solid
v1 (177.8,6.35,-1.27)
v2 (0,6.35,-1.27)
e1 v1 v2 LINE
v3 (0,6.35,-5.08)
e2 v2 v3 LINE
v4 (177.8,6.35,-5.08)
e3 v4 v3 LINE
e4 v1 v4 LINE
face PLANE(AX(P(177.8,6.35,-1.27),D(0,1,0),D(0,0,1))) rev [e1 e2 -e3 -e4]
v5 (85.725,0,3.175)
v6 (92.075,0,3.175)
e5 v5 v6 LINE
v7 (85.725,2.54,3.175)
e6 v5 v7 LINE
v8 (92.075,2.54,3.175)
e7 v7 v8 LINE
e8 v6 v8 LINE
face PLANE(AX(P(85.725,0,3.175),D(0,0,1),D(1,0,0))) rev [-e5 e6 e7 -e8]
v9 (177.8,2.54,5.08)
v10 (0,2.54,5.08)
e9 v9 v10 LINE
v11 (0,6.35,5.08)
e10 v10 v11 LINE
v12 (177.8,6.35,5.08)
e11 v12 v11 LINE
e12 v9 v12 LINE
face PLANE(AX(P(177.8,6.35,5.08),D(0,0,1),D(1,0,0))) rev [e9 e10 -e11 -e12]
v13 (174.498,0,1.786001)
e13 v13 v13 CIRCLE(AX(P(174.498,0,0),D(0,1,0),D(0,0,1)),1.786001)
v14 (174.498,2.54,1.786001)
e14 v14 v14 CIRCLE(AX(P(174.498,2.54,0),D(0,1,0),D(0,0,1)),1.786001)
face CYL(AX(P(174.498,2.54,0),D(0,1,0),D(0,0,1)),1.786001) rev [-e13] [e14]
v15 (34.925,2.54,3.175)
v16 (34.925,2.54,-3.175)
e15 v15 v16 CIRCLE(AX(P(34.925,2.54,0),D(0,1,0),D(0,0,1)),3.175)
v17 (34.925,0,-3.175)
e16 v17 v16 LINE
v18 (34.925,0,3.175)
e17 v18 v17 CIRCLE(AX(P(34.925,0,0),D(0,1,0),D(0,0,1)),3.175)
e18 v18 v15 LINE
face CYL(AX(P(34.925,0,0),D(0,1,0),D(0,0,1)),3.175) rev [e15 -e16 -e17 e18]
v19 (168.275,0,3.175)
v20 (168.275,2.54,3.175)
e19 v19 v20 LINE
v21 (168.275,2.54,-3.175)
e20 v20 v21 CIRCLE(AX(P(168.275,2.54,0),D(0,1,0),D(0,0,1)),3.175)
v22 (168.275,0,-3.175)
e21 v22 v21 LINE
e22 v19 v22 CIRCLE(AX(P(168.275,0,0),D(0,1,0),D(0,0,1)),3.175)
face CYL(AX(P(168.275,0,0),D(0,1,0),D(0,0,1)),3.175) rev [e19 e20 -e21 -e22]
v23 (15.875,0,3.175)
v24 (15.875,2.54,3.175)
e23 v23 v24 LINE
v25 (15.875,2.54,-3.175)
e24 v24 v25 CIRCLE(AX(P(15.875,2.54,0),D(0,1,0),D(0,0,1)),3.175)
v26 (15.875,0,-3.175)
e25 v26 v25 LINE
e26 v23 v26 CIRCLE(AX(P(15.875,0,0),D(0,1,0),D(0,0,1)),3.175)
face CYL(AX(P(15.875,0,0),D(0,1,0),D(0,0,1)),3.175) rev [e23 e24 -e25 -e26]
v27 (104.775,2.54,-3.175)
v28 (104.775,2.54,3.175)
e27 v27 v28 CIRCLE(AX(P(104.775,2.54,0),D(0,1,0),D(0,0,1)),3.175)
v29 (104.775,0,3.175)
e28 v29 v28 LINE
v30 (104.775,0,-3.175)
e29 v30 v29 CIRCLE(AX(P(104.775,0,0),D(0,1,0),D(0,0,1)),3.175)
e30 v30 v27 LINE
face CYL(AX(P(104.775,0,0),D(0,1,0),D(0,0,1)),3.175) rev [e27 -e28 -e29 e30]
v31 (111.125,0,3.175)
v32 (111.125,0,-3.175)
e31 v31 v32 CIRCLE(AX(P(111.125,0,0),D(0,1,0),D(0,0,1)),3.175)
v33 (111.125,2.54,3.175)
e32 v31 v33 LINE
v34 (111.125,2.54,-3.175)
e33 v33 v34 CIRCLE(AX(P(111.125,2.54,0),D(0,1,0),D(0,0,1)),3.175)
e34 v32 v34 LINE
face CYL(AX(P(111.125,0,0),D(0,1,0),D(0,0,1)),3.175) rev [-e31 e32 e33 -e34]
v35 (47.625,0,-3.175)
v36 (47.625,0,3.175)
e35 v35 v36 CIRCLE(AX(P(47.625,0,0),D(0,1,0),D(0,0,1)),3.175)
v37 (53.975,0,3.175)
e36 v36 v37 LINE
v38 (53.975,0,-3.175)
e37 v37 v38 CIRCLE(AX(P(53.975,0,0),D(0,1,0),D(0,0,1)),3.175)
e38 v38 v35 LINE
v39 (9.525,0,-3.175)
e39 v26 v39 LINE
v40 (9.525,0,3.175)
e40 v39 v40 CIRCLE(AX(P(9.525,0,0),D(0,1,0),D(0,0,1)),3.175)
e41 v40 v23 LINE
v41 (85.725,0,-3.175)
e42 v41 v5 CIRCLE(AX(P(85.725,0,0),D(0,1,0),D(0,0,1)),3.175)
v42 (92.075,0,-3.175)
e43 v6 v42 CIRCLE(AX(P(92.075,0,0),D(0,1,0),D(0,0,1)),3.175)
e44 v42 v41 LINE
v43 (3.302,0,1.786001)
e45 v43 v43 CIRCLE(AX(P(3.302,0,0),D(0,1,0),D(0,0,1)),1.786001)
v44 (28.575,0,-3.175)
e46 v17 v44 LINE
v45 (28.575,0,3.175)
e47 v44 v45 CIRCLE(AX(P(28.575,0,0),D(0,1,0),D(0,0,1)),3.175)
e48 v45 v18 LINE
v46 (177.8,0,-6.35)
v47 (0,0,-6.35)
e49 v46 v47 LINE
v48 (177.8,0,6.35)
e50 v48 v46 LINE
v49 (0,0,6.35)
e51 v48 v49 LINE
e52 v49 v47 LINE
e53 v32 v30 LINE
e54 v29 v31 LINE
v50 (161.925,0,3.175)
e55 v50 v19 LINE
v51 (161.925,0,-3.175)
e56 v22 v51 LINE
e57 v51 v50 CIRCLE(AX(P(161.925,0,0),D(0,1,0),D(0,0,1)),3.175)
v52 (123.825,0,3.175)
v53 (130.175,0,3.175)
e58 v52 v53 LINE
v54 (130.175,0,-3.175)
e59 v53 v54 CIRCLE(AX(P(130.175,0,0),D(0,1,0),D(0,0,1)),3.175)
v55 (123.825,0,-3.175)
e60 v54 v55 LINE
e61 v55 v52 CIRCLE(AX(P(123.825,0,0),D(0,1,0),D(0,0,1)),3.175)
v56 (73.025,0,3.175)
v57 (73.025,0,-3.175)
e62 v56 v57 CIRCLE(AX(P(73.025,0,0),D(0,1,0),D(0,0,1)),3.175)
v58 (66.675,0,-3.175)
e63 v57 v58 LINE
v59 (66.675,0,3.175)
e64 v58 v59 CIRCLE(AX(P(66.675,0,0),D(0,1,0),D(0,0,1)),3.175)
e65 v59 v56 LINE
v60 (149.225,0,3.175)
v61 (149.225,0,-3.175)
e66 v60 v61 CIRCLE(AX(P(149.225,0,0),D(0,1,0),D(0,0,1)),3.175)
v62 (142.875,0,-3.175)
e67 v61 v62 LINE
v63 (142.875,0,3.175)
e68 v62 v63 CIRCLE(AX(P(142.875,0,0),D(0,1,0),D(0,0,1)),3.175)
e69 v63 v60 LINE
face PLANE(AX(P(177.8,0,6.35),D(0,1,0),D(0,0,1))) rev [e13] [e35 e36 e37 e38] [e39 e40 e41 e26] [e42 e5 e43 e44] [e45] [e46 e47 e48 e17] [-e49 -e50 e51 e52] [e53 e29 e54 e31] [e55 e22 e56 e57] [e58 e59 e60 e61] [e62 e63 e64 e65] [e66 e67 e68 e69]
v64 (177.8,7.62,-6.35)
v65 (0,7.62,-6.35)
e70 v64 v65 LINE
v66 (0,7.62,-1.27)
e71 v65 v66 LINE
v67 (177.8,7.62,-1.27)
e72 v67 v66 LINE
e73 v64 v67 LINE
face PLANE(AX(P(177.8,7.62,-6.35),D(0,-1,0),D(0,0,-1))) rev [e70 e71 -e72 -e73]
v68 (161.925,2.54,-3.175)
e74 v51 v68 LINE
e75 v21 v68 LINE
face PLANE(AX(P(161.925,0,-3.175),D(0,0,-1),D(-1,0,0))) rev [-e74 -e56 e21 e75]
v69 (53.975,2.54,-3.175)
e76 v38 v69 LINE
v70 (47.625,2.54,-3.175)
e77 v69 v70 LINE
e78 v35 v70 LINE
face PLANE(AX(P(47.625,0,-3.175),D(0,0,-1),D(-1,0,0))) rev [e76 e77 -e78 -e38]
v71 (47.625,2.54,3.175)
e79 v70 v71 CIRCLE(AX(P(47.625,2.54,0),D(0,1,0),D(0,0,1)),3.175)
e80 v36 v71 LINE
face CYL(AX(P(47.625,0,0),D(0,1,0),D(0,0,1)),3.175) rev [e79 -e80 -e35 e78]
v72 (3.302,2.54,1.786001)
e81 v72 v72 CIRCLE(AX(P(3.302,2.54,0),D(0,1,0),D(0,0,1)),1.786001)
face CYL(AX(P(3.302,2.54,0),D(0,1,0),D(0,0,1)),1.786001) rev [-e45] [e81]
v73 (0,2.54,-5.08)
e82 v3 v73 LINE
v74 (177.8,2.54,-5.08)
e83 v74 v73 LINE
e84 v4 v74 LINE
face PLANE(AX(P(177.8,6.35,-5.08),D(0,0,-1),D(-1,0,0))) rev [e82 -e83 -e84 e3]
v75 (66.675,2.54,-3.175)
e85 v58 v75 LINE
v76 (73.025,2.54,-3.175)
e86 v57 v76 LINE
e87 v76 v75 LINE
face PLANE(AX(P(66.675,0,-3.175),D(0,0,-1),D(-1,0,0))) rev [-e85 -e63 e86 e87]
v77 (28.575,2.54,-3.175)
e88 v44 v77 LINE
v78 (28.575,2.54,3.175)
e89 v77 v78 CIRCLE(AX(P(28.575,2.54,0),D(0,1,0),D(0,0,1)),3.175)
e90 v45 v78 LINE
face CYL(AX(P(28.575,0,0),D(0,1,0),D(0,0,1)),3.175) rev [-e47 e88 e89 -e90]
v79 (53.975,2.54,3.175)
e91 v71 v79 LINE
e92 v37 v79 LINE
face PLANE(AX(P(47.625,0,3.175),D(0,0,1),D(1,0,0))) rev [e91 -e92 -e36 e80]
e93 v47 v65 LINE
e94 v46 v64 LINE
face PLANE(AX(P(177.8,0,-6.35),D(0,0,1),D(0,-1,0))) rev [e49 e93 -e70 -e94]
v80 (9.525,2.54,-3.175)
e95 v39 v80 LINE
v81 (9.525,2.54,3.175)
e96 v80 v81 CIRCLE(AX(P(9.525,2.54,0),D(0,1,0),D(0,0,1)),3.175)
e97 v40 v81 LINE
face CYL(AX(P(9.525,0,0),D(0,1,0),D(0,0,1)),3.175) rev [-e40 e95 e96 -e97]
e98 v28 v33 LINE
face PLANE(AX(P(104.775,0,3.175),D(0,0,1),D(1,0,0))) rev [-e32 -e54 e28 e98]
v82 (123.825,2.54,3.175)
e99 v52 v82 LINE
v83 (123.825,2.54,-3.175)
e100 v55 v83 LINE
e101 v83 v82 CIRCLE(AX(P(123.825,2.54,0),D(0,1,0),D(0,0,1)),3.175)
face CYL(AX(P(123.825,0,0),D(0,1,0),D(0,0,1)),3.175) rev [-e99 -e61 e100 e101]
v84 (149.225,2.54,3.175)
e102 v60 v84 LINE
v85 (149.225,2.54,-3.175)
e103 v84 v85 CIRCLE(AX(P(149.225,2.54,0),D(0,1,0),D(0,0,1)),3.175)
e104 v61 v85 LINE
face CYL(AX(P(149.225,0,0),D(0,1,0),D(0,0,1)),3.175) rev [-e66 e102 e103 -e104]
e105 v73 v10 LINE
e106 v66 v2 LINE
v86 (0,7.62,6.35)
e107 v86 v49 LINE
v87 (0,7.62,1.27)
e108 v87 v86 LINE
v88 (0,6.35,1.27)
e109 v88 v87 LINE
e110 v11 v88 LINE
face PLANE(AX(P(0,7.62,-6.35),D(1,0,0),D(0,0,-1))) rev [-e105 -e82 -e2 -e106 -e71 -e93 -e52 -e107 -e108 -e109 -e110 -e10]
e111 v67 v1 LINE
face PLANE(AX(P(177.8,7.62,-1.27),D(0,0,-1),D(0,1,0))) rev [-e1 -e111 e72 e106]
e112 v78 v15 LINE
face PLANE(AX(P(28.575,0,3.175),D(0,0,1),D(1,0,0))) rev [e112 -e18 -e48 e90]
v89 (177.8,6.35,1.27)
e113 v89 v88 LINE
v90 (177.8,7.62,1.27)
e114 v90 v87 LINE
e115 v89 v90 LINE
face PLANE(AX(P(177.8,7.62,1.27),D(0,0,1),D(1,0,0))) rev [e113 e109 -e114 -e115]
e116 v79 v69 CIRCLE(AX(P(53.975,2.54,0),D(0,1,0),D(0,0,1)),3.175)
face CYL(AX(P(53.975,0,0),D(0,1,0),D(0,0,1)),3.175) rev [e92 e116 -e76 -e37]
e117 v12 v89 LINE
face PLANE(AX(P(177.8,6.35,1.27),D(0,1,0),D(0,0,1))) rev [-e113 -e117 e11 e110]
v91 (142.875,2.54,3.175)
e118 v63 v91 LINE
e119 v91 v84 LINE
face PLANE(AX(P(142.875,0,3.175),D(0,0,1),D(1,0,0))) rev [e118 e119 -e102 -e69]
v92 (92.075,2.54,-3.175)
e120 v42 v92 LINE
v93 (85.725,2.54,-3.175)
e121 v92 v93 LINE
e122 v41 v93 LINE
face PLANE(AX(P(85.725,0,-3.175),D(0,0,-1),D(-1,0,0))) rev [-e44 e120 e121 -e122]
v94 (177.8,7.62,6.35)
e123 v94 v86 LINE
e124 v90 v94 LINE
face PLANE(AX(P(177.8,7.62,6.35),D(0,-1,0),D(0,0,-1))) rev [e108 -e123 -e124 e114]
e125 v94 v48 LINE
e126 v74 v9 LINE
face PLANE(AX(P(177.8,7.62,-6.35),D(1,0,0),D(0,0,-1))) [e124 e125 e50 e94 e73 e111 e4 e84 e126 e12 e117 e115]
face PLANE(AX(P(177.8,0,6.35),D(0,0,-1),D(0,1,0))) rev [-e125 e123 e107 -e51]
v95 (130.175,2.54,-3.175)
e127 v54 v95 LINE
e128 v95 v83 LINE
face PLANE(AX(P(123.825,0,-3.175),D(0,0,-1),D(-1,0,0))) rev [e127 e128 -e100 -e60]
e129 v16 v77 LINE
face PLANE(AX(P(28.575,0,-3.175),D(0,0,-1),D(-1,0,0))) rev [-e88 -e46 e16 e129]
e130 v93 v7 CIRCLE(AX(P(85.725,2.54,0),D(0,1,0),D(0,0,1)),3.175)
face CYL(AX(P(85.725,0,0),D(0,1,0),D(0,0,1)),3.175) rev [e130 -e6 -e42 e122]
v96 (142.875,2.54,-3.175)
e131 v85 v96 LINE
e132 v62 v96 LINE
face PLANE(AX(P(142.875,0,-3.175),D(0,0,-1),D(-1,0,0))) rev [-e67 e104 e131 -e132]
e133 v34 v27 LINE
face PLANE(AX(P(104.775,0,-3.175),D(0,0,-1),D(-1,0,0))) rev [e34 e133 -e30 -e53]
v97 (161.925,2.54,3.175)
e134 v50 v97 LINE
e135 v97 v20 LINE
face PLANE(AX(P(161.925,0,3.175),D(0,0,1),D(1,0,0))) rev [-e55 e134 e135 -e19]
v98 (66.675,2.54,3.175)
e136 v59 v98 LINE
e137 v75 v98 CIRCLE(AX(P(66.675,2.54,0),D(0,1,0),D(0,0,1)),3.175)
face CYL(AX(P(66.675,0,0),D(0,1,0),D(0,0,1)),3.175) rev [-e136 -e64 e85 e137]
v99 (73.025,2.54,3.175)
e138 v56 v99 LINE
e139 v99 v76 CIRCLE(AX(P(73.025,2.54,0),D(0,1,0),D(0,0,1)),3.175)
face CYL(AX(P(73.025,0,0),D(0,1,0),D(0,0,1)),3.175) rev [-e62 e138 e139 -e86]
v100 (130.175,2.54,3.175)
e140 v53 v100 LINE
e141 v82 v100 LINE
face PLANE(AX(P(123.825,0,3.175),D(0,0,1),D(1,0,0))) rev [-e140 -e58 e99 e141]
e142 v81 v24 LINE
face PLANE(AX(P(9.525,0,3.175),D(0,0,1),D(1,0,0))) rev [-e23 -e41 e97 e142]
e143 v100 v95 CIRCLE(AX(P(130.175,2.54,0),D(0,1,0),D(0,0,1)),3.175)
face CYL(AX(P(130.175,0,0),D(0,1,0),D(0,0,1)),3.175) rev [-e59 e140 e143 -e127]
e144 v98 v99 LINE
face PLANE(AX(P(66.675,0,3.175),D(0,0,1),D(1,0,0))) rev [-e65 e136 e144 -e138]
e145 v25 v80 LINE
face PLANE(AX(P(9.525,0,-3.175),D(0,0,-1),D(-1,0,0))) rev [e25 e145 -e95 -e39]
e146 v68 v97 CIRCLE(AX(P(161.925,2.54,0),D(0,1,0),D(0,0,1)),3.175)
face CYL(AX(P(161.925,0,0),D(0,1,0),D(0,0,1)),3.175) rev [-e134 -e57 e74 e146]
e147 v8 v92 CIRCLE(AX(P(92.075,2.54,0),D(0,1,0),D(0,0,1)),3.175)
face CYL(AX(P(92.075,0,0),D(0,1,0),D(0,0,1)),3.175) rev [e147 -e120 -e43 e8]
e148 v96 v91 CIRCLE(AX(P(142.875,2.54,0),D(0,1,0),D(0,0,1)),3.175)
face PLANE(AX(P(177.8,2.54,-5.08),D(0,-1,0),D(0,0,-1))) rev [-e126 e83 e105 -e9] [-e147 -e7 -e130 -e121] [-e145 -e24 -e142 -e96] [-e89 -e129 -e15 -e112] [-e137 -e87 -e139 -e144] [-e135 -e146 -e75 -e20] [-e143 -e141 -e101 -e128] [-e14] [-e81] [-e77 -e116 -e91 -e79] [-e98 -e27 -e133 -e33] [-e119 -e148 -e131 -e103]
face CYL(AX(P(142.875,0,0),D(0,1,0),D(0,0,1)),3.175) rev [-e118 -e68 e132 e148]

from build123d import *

# Parameters (mm, degrees)
BOSS_EXTRUDE1_DEPTH                 = 177.8
F_9_64_0_14063_DIAMETER_HOLE1_D     = 3.572002
F_9_64_0_14063_DIAMETER_HOLE1_DEPTH = 2.54
CUT_EXTRUDE1_START                  = -2.54
CUT_EXTRUDE1_DEPTH                  = 2.54
LPATTERN1_COUNT                     = 9
LPATTERN1_PITCH                     = 19.05


# Read off the part's stored shape, not the designer's step: Cut-Extrude1
with BuildPart() as part:
    # Sketch2 → Boss-Extrude1 (new body)
    with BuildSketch(Plane(origin=(0, 0, 0), x_dir=(0, 0, -1), z_dir=(1, 0, 0))):
        Polygon((-6.35, 0), (6.35, 0), (6.35, 7.62), (1.27, 7.62), (1.27, 6.35), (5.08, 6.35), (5.08, 2.54), (-5.08, 2.54), (-5.08, 6.35), (-1.27, 6.35), (-1.27, 7.62), (-6.35, 7.62), align=None)
    extrude(amount=BOSS_EXTRUDE1_DEPTH)

    # 9/64 (0.14063) Diameter Hole1
    with Locations(Plane(origin=(0, 2.54, 0), x_dir=(-1, 0, 0), z_dir=(0, 1, 0))):
        with Locations((-3.302, 0), (-174.498, 0)):
            Hole(F_9_64_0_14063_DIAMETER_HOLE1_D / 2, depth=F_9_64_0_14063_DIAMETER_HOLE1_DEPTH)

    # Cut-Extrude1 outline → Cut-Extrude1 (cut)
    with BuildSketch(Plane(origin=(0, 2.54, 0), x_dir=(1, 0, 0), z_dir=(0, 1, 0)).offset(CUT_EXTRUDE1_START)):
        with BuildLine():
            Line((15.875, 3.175), (9.525, 3.175))
            ThreePointArc((9.525, 3.175), (6.35, 0), (9.525, -3.175))
            Line((9.525, -3.175), (15.875, -3.175))
            ThreePointArc((15.875, -3.175), (19.05, 0), (15.875, 3.175))
        make_face()
    cut_extrude1 = extrude(amount=CUT_EXTRUDE1_DEPTH, mode=Mode.SUBTRACT)

    # LPattern1: Cut-Extrude1 ×9
    with Locations(*[(i * LPATTERN1_PITCH, 0, 0) for i in range(1, LPATTERN1_COUNT)]):
        add(cut_extrude1, mode=Mode.SUBTRACT)


solid = part.part
